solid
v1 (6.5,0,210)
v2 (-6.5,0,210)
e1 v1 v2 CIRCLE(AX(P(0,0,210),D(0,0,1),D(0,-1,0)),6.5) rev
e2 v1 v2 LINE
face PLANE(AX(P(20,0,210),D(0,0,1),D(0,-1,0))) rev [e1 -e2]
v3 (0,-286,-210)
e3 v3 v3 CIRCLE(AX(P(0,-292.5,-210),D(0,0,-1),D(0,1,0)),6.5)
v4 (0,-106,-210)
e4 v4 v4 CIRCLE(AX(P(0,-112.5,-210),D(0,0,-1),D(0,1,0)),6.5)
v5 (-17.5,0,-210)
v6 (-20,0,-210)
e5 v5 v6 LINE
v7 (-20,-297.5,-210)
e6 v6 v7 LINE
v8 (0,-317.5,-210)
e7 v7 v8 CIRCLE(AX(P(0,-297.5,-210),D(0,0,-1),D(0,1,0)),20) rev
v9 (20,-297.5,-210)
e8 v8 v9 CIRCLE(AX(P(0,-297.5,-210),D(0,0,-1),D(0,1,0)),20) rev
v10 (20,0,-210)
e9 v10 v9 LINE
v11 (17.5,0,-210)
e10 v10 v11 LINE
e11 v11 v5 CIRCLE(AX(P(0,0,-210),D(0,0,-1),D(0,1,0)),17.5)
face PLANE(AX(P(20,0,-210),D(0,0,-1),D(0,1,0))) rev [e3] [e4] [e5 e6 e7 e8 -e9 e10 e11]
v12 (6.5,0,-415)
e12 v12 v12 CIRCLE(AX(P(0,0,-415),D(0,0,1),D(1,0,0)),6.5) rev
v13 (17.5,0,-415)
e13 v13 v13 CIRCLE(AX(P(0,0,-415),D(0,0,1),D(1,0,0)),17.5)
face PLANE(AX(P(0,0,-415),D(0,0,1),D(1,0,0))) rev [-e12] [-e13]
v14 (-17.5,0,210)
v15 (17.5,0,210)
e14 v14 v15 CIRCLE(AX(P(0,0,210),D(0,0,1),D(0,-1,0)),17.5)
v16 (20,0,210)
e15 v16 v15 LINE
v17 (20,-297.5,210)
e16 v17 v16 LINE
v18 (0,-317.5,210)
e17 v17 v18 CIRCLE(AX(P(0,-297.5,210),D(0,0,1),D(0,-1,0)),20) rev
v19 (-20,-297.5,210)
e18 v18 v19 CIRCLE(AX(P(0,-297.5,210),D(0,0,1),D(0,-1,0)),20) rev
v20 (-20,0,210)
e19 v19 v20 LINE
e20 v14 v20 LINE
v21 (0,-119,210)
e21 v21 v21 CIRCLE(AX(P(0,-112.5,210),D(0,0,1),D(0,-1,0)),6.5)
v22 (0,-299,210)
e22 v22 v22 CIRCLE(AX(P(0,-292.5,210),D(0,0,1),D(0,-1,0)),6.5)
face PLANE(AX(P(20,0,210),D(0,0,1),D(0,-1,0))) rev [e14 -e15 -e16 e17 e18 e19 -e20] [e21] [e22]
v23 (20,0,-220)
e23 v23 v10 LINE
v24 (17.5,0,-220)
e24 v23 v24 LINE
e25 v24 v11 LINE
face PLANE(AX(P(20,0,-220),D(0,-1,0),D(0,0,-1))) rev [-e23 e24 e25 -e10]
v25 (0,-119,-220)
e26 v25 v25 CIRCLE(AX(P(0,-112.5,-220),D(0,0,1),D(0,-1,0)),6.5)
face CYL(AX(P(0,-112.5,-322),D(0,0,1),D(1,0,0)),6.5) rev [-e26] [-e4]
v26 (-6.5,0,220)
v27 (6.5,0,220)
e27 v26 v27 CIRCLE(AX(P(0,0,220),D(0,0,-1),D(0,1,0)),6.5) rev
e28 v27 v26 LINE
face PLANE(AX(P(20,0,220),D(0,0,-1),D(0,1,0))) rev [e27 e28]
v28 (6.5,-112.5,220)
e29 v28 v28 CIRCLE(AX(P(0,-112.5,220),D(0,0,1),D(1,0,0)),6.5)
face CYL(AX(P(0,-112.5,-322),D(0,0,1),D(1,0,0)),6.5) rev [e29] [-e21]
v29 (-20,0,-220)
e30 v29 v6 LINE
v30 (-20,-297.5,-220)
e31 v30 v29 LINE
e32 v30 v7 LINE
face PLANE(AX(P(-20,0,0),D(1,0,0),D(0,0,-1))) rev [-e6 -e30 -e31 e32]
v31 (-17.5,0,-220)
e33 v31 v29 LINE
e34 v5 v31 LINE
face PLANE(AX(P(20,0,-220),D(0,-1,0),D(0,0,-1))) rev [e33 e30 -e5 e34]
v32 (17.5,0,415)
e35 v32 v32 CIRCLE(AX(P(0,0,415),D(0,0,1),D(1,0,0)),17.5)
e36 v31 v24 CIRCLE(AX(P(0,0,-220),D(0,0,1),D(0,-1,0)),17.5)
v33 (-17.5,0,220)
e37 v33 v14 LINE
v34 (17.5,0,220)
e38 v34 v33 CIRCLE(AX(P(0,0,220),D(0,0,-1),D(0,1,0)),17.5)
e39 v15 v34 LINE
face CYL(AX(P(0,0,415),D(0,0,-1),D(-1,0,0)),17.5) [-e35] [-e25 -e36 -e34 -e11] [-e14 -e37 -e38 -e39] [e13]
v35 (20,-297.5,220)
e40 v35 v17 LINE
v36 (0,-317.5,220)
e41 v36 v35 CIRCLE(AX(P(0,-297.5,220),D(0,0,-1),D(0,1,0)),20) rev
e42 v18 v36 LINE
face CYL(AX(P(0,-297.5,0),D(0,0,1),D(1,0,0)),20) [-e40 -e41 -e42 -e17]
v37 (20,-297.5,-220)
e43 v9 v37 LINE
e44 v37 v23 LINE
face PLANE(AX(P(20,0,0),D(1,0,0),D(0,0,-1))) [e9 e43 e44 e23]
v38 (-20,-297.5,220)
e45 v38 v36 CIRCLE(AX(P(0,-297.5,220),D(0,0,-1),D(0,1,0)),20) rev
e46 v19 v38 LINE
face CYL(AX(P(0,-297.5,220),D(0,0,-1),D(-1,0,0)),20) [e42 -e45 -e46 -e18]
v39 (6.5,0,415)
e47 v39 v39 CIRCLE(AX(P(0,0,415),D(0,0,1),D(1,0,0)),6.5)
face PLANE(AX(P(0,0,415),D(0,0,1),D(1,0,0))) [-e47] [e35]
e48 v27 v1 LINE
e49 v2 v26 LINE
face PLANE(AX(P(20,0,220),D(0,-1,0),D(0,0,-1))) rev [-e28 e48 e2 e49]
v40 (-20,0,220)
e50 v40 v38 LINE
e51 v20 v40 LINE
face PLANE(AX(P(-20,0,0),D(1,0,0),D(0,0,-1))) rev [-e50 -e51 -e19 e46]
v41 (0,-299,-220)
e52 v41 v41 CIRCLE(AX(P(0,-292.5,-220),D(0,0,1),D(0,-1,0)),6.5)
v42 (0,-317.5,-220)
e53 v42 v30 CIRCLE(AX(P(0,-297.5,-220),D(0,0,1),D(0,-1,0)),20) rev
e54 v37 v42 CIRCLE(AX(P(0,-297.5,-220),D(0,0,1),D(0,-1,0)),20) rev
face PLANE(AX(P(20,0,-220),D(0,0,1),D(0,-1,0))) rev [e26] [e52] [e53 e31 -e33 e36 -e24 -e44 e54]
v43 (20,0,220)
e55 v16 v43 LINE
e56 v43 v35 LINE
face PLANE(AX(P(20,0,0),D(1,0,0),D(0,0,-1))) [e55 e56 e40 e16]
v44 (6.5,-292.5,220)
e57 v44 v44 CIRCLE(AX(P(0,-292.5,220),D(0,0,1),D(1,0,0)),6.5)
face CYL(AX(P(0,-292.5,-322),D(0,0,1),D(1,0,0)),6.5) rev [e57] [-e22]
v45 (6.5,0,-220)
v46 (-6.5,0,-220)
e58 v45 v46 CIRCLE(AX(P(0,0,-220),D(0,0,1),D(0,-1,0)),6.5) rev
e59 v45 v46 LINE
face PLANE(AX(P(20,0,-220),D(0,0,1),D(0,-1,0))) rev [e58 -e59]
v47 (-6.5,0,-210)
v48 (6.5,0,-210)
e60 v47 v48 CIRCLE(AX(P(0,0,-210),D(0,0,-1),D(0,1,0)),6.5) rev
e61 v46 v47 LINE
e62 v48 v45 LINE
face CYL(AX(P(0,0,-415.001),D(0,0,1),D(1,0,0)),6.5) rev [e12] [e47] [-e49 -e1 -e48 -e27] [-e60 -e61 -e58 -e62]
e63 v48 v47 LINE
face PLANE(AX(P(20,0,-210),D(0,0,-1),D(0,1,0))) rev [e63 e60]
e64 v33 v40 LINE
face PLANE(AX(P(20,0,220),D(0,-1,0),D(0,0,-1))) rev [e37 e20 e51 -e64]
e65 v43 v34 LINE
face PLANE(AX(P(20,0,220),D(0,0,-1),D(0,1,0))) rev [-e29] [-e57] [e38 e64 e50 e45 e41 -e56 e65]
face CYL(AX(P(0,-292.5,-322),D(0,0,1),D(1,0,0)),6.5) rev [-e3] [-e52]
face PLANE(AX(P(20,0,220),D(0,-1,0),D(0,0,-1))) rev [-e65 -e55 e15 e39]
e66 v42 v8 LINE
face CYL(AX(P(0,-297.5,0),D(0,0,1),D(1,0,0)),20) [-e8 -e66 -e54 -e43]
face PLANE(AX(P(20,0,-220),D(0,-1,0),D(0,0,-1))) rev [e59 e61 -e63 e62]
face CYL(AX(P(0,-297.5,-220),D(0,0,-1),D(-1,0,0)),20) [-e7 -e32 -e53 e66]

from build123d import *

# Parameters (mm, degrees)
SKETCH1_R           = 17.5
BOSS_EXTRUDE1_DEPTH = 415
CUT_EXTRUDE1_REACH  = 832.369
SKETCH2_R           = 6.5
SKETCH3_W           = 10
SKETCH3_H           = 317.5
BOSS_EXTRUDE2_DEPTH = 20
FILLET1_R           = 20
SKETCH4_R           = 6.5
CUT_EXTRUDE2_DEPTH  = 542


with BuildPart() as part:
    # Sketch1 → Boss-Extrude1 (new, symmetric)
    with BuildSketch(Plane.XY):
        Circle(SKETCH1_R)
    extrude(amount=BOSS_EXTRUDE1_DEPTH, both=True)

    # Sketch2 → Cut-Extrude1 (cut, up to next)
    with BuildSketch(Plane.XY.offset(415), mode=Mode.PRIVATE) as cut_extrude1_sk1:
        Circle(SKETCH2_R)
    cut_extrude1_tool1 = extrude(cut_extrude1_sk1.sketch, amount=-CUT_EXTRUDE1_REACH, mode=Mode.PRIVATE) & part.part
    add(cut_extrude1_tool1.solids().sort_by_distance((0, 0, 415))[0], mode=Mode.SUBTRACT)

    # Sketch3 → Boss-Extrude2 (add, symmetric)
    with BuildSketch(Plane(origin=(0, 0, 0), x_dir=(0, 0, -1), z_dir=(1, 0, 0))):
        with Locations((-215, -158.75)):
            Rectangle(SKETCH3_W, SKETCH3_H)
        with Locations((215, -158.75)):
            Rectangle(SKETCH3_W, SKETCH3_H)
    extrude(amount=BOSS_EXTRUDE2_DEPTH, both=True)

    # Fillet1
    fillet1_edges = [part.edges().sort_by_distance(p)[0] for p in [
        (-20, -317.5, -215),
        (20, -317.5, -215),
        (-20, -317.5, 215),
        (20, -317.5, 215),
    ]]
    fillet(fillet1_edges, radius=FILLET1_R - 0.0001)  # a hair under: the kernel refuses the full size

    # Sketch4 → Cut-Extrude2 (cut)
    with BuildSketch(Plane.XY.offset(220)):
        with Locations(Location((0, -292.5, 0), (0, 0, 270))):
            Circle(SKETCH4_R)
        with Locations(Location((0, -112.5, 0), (0, 0, 270))):
            Circle(SKETCH4_R)
    extrude(amount=-CUT_EXTRUDE2_DEPTH, mode=Mode.SUBTRACT)


solid = part.part
